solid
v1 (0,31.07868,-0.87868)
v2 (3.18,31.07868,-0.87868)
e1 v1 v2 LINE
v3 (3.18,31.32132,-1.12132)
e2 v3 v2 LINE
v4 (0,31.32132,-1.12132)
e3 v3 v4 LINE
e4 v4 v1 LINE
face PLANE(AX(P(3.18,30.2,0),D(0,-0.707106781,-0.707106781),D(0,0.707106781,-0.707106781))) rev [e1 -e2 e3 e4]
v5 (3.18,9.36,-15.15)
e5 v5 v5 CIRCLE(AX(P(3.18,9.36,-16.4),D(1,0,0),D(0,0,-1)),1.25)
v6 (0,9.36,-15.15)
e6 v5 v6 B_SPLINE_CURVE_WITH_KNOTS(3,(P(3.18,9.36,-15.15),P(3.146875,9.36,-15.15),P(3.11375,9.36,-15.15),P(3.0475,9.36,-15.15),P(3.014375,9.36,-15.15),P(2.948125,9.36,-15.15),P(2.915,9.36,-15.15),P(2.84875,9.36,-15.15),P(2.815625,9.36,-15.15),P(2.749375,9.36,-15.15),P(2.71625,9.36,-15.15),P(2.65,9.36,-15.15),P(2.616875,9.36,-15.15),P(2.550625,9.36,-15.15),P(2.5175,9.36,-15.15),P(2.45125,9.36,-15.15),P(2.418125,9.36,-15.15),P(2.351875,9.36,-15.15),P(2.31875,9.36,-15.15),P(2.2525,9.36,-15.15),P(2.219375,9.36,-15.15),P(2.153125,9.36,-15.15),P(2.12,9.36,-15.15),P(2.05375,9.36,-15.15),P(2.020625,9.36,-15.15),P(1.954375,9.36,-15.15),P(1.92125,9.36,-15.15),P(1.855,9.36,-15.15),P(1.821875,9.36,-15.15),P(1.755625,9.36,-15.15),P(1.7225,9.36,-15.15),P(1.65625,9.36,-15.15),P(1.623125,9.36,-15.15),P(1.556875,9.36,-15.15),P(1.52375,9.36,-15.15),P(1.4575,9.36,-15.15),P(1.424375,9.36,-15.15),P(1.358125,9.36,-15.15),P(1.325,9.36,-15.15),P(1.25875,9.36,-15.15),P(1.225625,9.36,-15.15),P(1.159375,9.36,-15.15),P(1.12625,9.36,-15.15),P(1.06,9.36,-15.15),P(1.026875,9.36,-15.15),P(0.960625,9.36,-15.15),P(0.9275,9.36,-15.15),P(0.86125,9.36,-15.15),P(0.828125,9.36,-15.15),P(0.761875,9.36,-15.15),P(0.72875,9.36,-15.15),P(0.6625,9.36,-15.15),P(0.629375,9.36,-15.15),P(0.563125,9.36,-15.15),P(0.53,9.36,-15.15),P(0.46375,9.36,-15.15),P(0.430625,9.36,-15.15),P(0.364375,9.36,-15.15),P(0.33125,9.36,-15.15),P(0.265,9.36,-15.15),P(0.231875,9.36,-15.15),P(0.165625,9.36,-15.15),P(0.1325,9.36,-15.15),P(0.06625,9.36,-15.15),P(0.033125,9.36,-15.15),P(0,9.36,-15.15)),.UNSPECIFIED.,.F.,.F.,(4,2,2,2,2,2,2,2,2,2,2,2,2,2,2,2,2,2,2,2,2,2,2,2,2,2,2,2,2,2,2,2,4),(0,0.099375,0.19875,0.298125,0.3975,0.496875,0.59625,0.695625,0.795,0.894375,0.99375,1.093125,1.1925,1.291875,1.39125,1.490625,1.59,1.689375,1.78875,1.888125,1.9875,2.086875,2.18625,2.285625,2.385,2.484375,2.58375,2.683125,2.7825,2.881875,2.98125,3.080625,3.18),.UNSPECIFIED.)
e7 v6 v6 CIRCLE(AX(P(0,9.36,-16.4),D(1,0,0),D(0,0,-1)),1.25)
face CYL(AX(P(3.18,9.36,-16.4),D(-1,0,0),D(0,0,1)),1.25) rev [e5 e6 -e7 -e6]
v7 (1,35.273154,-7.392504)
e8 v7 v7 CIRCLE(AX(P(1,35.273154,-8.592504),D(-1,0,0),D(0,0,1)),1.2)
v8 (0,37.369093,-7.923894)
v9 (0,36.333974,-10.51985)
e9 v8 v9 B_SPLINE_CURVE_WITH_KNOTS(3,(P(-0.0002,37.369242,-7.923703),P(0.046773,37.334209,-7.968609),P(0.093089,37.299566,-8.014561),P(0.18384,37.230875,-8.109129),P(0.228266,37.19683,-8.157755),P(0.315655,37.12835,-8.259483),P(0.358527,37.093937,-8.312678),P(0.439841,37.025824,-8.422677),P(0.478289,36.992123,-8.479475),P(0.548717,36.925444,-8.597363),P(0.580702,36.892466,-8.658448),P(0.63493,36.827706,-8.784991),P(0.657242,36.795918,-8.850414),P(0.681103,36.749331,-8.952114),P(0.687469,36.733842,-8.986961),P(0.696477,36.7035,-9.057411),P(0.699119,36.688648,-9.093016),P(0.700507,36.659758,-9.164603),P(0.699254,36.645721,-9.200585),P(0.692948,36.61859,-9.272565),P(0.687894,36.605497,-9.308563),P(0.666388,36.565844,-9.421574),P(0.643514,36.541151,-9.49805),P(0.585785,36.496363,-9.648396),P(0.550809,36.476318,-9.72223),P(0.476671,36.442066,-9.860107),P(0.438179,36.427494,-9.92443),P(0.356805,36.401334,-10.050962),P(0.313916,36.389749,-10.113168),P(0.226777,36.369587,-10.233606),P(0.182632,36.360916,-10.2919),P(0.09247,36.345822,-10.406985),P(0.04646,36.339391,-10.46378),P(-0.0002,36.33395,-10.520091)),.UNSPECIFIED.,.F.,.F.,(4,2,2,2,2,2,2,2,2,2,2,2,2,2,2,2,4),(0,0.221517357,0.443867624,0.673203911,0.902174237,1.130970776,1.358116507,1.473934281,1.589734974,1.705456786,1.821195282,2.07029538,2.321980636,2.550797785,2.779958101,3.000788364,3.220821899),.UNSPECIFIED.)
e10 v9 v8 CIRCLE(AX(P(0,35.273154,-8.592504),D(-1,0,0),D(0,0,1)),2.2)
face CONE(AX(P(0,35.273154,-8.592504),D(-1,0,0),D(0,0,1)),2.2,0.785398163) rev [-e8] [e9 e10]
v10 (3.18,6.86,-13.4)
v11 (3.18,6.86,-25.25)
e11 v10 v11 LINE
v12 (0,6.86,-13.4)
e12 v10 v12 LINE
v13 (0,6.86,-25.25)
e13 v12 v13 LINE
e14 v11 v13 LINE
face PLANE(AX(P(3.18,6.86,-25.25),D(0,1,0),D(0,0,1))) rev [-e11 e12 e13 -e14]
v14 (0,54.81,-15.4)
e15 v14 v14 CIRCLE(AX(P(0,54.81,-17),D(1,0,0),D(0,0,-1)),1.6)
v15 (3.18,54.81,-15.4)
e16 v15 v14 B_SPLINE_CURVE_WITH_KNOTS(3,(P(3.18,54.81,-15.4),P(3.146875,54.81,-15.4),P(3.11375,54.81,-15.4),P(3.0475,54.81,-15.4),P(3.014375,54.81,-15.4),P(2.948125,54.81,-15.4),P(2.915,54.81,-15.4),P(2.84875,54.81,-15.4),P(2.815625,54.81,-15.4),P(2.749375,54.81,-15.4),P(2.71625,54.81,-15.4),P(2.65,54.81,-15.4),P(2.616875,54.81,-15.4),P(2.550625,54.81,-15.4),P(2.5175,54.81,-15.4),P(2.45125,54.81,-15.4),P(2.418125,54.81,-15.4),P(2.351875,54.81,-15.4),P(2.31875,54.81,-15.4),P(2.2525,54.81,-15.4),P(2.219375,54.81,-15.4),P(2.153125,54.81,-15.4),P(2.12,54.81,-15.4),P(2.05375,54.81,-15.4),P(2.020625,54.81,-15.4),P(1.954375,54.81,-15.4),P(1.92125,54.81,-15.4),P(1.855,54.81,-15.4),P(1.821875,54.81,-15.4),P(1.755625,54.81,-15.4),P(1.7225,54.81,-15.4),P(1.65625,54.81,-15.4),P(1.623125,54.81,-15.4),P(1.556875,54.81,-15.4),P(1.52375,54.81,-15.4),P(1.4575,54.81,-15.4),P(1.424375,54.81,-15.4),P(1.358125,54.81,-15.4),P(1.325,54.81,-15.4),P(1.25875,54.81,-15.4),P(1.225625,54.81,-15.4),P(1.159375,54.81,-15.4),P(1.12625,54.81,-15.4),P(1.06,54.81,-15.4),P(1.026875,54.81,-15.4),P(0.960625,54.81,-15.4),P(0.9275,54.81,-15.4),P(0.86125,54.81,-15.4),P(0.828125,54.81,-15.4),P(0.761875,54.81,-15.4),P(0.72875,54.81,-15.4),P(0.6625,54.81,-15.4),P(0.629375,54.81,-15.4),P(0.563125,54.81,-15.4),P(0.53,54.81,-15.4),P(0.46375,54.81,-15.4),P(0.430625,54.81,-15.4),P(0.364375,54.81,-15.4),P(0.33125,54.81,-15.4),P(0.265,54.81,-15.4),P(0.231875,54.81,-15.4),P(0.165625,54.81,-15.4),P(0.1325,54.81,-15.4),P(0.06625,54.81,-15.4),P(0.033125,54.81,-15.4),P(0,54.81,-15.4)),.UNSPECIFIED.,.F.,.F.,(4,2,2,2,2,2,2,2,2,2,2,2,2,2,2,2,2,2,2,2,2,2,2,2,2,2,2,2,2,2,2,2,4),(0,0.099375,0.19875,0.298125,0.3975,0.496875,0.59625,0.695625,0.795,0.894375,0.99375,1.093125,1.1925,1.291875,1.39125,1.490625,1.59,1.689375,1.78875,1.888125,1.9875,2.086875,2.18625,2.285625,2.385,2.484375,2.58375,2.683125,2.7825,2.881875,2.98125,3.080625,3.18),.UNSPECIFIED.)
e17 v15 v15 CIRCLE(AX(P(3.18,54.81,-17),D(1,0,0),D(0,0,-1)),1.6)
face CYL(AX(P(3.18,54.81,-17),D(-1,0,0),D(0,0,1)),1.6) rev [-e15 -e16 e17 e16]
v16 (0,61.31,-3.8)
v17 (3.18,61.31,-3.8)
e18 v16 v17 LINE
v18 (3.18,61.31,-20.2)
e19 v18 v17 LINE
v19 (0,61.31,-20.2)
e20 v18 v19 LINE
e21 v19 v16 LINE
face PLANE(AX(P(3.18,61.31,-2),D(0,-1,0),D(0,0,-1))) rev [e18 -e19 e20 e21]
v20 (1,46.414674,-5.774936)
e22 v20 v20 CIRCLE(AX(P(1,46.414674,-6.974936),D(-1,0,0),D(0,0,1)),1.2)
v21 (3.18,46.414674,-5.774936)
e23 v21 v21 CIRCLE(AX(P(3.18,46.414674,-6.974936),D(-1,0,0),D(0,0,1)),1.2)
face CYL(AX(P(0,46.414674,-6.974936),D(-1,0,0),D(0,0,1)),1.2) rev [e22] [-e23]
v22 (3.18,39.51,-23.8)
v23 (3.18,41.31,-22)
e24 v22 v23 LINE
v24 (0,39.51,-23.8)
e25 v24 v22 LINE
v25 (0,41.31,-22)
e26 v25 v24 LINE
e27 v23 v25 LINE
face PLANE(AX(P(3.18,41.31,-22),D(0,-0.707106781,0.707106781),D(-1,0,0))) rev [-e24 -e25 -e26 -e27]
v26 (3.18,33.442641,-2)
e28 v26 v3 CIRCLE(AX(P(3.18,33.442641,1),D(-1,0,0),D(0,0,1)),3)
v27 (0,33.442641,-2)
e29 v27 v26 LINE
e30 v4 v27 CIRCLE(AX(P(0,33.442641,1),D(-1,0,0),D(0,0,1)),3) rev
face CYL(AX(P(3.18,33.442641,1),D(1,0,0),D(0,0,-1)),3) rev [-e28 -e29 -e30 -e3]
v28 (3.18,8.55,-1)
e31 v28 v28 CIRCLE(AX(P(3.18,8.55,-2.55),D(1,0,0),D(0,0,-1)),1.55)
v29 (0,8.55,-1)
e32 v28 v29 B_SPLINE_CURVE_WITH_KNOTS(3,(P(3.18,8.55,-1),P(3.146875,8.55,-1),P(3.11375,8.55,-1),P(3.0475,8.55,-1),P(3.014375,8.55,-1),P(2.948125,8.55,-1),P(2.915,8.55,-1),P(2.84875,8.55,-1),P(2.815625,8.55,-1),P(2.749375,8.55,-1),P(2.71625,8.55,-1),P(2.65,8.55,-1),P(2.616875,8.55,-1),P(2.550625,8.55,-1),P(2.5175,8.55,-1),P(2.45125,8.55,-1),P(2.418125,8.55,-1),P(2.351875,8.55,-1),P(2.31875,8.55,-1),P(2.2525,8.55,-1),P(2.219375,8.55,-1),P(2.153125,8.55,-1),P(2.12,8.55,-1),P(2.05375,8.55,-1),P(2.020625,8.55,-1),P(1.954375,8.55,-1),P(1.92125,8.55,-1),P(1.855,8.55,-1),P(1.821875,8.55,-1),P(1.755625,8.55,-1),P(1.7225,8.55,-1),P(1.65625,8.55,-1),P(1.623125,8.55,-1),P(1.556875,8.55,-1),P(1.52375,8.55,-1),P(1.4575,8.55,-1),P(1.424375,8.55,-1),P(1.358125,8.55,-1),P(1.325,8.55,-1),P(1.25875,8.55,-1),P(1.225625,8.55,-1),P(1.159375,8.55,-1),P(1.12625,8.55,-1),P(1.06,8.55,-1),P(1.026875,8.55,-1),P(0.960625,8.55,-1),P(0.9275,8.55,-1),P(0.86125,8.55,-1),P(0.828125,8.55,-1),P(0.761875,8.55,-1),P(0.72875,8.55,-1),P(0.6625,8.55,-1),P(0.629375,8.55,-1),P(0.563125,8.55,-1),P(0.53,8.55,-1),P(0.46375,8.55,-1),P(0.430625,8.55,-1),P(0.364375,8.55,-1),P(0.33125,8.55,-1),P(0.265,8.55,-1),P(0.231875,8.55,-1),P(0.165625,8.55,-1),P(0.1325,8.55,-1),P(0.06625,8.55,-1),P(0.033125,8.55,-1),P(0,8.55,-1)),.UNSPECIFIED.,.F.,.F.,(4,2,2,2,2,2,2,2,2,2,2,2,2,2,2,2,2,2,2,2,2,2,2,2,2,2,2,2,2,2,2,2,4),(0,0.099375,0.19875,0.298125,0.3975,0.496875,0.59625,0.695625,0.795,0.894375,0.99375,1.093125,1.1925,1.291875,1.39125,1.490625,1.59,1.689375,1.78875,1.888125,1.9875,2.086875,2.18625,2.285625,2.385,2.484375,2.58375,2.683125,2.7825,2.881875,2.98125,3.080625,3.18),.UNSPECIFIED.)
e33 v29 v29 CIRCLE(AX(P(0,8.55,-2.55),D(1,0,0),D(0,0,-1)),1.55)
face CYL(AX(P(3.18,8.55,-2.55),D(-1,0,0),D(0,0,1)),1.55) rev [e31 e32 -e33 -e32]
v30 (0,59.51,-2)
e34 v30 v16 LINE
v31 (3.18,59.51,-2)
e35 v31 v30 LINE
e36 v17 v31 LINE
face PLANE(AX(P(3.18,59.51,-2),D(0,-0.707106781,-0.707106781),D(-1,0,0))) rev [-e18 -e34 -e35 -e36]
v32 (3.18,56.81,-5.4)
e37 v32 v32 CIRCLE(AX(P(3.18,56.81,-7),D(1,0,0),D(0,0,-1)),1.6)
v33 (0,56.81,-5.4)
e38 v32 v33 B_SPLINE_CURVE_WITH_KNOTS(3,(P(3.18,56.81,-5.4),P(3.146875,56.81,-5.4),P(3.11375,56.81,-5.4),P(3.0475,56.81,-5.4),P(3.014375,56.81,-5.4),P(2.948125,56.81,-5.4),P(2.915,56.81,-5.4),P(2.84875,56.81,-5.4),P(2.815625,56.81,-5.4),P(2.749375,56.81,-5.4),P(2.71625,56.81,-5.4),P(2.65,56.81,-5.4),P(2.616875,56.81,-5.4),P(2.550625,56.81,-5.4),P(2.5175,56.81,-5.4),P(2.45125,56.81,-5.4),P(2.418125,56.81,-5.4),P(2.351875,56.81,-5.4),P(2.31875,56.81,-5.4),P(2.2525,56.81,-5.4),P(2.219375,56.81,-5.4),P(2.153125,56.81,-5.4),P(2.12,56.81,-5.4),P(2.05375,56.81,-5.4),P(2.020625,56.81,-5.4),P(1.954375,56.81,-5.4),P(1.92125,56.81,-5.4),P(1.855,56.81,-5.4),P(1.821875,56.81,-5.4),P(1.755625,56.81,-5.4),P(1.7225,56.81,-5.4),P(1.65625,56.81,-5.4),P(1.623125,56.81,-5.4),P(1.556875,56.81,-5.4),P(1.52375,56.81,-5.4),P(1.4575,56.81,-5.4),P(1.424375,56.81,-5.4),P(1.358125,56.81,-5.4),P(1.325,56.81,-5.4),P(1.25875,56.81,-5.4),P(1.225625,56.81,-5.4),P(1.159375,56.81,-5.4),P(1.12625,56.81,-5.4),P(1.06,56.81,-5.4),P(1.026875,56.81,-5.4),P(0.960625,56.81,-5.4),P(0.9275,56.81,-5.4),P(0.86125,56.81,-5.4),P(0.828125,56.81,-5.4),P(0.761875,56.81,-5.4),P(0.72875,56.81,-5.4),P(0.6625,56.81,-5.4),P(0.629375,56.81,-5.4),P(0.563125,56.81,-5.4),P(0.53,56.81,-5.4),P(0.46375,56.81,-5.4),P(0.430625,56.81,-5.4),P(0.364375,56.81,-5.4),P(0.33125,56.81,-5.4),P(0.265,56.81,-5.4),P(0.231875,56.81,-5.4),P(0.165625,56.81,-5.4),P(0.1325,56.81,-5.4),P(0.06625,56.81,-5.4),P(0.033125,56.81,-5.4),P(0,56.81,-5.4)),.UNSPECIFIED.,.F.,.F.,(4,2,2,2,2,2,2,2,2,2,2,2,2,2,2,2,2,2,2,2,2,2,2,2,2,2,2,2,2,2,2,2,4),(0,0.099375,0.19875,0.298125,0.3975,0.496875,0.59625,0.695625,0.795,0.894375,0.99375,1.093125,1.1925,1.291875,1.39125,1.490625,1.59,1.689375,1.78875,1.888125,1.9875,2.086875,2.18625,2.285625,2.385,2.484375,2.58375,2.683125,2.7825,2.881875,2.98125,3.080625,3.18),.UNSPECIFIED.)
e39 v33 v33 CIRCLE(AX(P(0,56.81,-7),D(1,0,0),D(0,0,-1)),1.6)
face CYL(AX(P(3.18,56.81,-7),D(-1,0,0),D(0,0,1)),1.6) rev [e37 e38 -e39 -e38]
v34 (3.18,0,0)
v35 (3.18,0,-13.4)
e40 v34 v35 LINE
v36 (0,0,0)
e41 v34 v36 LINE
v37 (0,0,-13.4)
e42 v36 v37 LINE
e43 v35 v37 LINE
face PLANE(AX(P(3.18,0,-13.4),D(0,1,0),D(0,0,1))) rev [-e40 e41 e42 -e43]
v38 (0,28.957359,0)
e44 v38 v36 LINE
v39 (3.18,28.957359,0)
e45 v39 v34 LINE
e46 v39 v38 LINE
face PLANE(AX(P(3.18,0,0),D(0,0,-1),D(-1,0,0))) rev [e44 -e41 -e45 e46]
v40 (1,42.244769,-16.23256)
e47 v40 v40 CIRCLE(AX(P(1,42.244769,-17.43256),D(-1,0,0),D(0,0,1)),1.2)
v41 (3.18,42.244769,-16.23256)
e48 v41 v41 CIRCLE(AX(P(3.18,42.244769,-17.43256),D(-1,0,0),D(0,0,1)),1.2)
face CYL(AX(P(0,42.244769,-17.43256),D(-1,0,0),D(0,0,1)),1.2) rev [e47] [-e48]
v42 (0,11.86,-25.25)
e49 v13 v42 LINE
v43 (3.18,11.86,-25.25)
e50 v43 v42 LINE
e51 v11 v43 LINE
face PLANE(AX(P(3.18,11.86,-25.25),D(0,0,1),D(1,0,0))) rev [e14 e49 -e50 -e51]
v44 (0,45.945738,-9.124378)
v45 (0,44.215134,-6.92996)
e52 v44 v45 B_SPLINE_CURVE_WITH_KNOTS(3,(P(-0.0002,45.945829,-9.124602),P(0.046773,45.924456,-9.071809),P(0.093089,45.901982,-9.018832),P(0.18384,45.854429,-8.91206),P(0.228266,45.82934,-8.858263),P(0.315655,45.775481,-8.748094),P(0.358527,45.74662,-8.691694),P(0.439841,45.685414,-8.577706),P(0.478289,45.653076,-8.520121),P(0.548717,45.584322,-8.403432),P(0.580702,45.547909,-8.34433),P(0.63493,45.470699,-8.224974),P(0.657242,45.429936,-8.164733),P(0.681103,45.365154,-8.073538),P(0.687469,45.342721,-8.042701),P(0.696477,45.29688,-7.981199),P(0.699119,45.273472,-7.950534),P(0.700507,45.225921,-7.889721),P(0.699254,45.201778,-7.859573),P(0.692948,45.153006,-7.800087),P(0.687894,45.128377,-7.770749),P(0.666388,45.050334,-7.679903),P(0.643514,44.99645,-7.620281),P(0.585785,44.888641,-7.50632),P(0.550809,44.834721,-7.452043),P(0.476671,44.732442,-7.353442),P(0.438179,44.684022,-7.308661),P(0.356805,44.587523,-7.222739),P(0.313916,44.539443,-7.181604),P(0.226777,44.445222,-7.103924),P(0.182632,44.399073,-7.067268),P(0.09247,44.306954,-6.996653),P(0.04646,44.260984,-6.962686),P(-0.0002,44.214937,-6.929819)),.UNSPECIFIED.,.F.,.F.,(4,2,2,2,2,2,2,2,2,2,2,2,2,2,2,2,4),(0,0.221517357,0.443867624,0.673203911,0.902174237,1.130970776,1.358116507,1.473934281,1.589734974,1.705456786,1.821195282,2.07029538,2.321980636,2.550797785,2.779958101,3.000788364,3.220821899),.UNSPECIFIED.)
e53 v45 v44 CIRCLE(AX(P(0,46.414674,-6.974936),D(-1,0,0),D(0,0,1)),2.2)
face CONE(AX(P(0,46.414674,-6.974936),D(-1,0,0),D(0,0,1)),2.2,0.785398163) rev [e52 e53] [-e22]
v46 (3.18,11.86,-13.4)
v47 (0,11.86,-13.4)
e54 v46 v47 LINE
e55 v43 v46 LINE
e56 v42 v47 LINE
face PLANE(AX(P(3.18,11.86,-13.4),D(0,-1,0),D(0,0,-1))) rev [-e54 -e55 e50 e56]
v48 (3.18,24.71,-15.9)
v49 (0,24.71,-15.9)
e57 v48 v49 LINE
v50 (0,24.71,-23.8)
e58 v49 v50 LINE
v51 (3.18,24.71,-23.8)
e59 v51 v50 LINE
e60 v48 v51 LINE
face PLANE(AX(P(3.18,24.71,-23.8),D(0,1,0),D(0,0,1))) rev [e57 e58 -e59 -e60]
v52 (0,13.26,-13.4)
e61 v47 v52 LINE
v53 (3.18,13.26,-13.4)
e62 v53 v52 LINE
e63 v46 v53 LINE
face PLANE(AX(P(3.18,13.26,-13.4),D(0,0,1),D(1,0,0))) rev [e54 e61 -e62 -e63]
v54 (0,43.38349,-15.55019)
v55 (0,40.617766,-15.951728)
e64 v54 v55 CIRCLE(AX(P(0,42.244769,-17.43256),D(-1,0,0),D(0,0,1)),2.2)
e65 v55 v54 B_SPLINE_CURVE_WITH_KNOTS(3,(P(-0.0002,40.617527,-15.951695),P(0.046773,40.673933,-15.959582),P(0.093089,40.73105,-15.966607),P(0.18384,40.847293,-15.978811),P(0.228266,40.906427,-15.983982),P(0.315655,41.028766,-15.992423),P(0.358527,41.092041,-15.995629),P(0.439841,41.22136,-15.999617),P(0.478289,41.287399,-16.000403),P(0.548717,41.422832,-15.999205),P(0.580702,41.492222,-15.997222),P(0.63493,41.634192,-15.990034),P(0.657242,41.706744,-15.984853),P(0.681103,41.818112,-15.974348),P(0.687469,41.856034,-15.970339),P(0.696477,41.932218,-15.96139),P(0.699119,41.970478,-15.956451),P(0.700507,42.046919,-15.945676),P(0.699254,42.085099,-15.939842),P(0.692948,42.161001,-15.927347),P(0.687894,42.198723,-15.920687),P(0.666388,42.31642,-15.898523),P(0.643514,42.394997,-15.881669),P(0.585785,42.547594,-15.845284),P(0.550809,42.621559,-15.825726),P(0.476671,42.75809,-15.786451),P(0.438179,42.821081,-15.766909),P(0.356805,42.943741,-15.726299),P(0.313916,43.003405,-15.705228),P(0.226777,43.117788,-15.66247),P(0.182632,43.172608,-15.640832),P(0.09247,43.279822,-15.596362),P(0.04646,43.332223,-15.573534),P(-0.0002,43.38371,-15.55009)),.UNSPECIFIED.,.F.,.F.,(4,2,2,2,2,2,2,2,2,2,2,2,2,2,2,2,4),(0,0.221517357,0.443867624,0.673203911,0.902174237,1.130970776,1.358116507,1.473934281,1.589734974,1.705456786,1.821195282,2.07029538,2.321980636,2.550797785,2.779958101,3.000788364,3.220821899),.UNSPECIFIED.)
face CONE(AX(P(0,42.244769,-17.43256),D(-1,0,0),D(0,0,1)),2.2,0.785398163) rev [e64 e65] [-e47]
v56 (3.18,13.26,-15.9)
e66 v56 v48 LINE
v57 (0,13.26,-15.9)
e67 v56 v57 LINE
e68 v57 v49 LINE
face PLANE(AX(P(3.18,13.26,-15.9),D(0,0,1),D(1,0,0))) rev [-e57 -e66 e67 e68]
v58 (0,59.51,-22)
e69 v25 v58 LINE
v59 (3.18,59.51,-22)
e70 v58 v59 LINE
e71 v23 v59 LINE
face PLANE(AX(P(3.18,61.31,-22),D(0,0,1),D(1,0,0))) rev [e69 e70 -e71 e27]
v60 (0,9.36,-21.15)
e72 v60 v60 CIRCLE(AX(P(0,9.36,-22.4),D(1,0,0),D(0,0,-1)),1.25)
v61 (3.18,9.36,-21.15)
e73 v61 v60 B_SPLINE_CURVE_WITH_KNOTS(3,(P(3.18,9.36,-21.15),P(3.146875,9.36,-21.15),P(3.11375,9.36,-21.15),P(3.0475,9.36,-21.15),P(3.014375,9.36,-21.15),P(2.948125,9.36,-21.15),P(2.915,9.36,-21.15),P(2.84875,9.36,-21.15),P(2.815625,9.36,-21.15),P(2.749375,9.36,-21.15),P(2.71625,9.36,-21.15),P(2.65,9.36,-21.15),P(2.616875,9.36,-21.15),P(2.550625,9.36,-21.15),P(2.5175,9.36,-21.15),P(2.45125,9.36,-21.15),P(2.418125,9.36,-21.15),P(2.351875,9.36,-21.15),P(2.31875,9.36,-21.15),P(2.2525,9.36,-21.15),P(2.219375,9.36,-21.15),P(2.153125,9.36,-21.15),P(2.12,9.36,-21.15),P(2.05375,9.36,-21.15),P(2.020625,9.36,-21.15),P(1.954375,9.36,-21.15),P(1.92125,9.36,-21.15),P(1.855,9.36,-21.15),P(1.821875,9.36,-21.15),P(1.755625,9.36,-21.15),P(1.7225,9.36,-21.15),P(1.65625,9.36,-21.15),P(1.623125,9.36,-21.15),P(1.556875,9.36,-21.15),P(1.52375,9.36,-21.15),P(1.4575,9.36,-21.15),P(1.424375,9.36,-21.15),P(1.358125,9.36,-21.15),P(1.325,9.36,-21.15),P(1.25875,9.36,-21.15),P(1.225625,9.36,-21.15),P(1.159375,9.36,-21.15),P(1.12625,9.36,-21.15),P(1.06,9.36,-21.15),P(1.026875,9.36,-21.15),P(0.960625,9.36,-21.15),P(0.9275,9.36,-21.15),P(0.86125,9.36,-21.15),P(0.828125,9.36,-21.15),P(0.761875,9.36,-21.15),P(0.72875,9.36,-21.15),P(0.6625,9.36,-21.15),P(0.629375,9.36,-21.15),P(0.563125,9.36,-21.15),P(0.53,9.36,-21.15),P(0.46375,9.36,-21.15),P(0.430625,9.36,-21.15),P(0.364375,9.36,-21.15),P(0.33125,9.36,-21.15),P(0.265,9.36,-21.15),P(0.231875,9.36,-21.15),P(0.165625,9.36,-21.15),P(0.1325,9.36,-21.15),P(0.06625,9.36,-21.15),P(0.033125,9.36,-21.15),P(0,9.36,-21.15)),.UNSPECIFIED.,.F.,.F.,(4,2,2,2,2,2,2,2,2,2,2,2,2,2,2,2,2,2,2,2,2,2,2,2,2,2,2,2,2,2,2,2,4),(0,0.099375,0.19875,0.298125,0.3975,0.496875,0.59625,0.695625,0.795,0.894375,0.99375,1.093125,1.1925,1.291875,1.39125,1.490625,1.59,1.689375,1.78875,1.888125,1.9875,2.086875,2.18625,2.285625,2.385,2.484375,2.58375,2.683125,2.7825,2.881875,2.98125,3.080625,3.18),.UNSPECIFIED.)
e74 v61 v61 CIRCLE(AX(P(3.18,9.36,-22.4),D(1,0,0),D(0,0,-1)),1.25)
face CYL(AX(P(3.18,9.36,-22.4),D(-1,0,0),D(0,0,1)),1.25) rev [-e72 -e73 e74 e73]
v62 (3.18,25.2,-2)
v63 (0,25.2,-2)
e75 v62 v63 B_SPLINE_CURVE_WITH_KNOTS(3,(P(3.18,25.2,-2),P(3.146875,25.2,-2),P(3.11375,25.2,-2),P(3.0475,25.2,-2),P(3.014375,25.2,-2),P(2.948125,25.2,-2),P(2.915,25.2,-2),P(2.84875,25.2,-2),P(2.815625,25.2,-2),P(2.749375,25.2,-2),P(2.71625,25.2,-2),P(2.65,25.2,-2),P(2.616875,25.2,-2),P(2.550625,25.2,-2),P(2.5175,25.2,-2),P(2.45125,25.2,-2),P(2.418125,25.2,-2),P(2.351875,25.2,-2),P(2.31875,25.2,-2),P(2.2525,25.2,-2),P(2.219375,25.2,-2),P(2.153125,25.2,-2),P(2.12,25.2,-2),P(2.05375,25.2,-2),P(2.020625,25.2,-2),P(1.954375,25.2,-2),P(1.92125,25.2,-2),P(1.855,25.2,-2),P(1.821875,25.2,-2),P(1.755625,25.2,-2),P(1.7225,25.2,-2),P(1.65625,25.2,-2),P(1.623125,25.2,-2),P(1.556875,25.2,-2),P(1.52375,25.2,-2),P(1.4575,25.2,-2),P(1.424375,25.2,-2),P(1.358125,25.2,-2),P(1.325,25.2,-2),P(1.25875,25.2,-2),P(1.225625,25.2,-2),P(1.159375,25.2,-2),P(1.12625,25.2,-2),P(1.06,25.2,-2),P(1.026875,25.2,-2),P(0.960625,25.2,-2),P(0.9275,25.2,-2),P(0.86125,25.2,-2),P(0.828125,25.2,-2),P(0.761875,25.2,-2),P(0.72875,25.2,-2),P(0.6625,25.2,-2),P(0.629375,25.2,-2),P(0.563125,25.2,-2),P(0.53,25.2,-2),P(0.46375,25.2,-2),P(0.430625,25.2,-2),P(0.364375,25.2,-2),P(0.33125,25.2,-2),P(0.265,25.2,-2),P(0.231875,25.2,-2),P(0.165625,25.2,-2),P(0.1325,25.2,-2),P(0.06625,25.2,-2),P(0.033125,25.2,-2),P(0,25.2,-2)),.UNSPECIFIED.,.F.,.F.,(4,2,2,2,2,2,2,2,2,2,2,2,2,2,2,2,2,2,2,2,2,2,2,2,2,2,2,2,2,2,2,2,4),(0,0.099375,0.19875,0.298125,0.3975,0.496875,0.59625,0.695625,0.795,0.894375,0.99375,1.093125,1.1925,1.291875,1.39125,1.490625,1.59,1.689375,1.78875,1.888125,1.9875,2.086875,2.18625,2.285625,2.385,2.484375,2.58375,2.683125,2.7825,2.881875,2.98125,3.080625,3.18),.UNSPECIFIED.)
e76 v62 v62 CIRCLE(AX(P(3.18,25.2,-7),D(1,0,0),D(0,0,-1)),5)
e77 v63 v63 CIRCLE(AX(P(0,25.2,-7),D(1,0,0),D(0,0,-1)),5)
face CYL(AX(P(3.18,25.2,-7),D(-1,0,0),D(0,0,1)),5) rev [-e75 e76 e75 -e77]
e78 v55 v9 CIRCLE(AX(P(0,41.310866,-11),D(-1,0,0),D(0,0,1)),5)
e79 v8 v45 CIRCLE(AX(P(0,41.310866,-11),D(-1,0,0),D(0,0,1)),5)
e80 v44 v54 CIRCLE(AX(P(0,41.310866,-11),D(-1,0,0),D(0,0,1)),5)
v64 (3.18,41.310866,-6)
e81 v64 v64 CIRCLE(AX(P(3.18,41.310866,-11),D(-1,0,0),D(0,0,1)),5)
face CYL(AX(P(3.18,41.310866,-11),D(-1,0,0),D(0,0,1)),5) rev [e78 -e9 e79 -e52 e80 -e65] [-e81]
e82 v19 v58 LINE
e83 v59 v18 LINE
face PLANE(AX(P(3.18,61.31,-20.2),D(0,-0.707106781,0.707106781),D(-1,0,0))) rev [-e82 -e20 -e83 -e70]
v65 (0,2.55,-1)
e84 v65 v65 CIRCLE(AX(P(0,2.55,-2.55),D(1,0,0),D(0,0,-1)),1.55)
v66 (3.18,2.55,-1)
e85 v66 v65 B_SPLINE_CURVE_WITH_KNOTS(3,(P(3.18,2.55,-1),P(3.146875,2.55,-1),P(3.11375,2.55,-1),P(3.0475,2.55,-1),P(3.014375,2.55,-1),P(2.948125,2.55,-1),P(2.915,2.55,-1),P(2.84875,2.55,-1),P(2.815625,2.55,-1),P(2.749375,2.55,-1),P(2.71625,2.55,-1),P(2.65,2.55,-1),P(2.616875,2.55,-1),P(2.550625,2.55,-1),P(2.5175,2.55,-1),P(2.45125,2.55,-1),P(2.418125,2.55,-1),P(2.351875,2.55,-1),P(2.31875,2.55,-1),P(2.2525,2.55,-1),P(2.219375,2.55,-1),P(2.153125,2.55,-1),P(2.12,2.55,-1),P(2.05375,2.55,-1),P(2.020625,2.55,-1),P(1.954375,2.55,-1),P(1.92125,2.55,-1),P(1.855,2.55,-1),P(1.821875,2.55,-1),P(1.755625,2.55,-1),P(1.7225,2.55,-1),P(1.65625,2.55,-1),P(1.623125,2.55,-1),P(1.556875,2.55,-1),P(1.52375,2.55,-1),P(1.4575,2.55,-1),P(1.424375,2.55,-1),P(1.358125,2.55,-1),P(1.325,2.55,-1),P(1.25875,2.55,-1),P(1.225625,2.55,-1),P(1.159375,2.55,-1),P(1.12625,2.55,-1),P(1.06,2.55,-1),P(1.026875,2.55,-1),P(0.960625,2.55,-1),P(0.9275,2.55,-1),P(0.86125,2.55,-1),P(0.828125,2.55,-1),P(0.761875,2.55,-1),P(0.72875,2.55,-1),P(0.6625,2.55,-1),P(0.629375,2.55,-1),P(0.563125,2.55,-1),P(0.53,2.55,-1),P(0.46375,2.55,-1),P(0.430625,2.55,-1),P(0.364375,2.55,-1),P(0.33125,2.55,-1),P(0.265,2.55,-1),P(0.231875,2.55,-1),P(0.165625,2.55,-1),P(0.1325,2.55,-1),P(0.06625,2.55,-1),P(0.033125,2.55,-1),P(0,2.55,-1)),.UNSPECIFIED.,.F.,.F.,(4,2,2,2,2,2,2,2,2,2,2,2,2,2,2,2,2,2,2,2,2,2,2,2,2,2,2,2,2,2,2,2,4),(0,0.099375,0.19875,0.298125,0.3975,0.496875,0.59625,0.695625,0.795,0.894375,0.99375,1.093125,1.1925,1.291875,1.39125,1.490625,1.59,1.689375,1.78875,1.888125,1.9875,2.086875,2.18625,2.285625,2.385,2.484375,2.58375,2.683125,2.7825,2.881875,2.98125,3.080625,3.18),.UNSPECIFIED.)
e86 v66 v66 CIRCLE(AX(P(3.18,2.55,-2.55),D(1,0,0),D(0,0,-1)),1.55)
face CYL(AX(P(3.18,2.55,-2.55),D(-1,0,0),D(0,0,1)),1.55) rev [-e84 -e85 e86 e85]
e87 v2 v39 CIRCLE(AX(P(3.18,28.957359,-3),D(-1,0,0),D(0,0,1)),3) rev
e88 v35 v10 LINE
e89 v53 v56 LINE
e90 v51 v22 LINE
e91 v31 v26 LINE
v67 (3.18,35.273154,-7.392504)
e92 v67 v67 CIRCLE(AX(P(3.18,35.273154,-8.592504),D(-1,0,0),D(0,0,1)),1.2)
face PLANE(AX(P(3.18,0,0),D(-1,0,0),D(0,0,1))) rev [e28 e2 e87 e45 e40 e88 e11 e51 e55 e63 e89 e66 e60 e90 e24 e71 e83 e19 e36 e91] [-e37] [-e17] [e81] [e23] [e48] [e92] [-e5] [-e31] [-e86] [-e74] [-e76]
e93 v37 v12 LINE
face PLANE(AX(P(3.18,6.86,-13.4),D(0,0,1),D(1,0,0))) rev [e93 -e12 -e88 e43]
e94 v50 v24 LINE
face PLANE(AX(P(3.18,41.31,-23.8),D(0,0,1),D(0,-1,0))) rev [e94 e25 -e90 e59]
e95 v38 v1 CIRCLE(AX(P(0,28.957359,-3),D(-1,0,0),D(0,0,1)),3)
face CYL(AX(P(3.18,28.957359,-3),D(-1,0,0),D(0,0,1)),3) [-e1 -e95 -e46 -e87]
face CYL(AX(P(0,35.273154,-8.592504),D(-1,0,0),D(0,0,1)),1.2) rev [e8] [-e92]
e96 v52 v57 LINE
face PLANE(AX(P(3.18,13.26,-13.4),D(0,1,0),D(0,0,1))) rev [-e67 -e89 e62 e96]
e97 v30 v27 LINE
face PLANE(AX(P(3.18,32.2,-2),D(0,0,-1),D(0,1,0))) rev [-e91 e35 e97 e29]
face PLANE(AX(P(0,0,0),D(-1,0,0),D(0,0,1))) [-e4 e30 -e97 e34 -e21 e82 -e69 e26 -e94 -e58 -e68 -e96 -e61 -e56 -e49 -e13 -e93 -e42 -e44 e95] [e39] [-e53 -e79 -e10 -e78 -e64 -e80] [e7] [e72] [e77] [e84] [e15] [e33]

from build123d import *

# Parameters (mm, degrees)
SKETCH1_R                                       = 5
SKETCH1_R_2                                     = 1.6
SKETCH1_R_3                                     = 1.25
SKETCH1_R_4                                     = 1.55
BOSS_EXTRUDE1_DEPTH                             = 3.18
CSK_FOR_M2_FLAT_HEAD_MACHINE_SCREW1_D           = 2.4
CSK_FOR_M2_FLAT_HEAD_MACHINE_SCREW1_DEPTH       = 3.508967257
CSK_FOR_M2_FLAT_HEAD_MACHINE_SCREW1_CSINK_D     = 4.4
CSK_FOR_M2_FLAT_HEAD_MACHINE_SCREW1_CSINK_ANGLE = 90
CSK_FOR_M2_FLAT_HEAD_MACHINE_SCREW1_TIP         = 0.721032743
SKETCH3_R                                       = 5
CUT_EXTRUDE4_DEPTH                              = 67.382158748
FILLET2_R                                       = 3
CHAMFER2_SIZE                                   = 1.8


with BuildPart() as part:
    # Sketch1 → Boss-Extrude1 (new body)
    with BuildSketch(Plane(origin=(0, 0, 0), x_dir=(0, 0, -1), z_dir=(1, 0, 0))):
        Polygon((0, 0), (0, 30.2), (2, 32.2), (2, 61.31), (22, 61.31), (22, 41.31), (23.8, 41.31), (23.8, 24.71), (15.9, 24.71), (15.9, 13.26), (13.4, 13.26), (13.4, 11.86), (25.25, 11.86), (25.25, 6.86), (13.4, 6.86), (13.4, 0), align=None)
        with Locations(Location((7, 25.2, 0), (0, 0, 180))):
            Circle(SKETCH1_R, mode=Mode.SUBTRACT)
        with Locations(Location((7, 56.81, 0), (0, 0, 180))):
            Circle(SKETCH1_R_2, mode=Mode.SUBTRACT)
        with Locations(Location((17, 54.81, 0), (0, 0, 180))):
            Circle(SKETCH1_R_2, mode=Mode.SUBTRACT)
        with Locations(Location((22.4, 9.36, 0), (0, 0, 180))):
            Circle(SKETCH1_R_3, mode=Mode.SUBTRACT)
        with Locations(Location((16.4, 9.36, 0), (0, 0, 180))):
            Circle(SKETCH1_R_3, mode=Mode.SUBTRACT)
        with Locations(Location((2.55, 2.55, 0), (0, 0, 180))):
            Circle(SKETCH1_R_4, mode=Mode.SUBTRACT)
        with Locations(Location((2.55, 8.55, 0), (0, 0, 180))):
            Circle(SKETCH1_R_4, mode=Mode.SUBTRACT)
    extrude(amount=BOSS_EXTRUDE1_DEPTH)

    # CSK for M2 Flat Head Machine Screw1
    with Locations(Plane.ZY):
        with Locations((-6.974936087, 46.414674329), (-17.432559713, 42.244769284), (-8.592504199, 35.273154083)):
            CounterSinkHole(CSK_FOR_M2_FLAT_HEAD_MACHINE_SCREW1_D / 2, CSK_FOR_M2_FLAT_HEAD_MACHINE_SCREW1_CSINK_D / 2, depth=CSK_FOR_M2_FLAT_HEAD_MACHINE_SCREW1_DEPTH, counter_sink_angle=CSK_FOR_M2_FLAT_HEAD_MACHINE_SCREW1_CSINK_ANGLE)
            with Locations((0, 0, -(CSK_FOR_M2_FLAT_HEAD_MACHINE_SCREW1_DEPTH + CSK_FOR_M2_FLAT_HEAD_MACHINE_SCREW1_TIP / 2))):  # 118° drill point
                Cone(0, CSK_FOR_M2_FLAT_HEAD_MACHINE_SCREW1_D / 2, CSK_FOR_M2_FLAT_HEAD_MACHINE_SCREW1_TIP, mode=Mode.SUBTRACT)

    # Sketch3 → Cut-Extrude4 (cut, through all)
    with BuildSketch(Plane.ZY):
        with Locations((-11, 41.310865899)):
            Circle(SKETCH3_R)
    extrude(amount=-CUT_EXTRUDE4_DEPTH, mode=Mode.SUBTRACT)

    # Fillet2
    fillet2_edges = [part.edges().sort_by_distance(p)[0] for p in [
        (1.59, 30.2, 0),
        (1.59, 32.2, -2),
    ]]
    fillet(fillet2_edges, radius=FILLET2_R)

    # Chamfer2
    chamfer2_edges = [part.edges().sort_by_distance(p)[0] for p in [
        (1.59, 61.31, -22),
        (1.59, 61.31, -2),
        (1.59, 41.31, -23.8),
    ]]
    chamfer(chamfer2_edges, length=CHAMFER2_SIZE - 0.0001)  # a hair under: the kernel refuses the full size


solid = part.part
